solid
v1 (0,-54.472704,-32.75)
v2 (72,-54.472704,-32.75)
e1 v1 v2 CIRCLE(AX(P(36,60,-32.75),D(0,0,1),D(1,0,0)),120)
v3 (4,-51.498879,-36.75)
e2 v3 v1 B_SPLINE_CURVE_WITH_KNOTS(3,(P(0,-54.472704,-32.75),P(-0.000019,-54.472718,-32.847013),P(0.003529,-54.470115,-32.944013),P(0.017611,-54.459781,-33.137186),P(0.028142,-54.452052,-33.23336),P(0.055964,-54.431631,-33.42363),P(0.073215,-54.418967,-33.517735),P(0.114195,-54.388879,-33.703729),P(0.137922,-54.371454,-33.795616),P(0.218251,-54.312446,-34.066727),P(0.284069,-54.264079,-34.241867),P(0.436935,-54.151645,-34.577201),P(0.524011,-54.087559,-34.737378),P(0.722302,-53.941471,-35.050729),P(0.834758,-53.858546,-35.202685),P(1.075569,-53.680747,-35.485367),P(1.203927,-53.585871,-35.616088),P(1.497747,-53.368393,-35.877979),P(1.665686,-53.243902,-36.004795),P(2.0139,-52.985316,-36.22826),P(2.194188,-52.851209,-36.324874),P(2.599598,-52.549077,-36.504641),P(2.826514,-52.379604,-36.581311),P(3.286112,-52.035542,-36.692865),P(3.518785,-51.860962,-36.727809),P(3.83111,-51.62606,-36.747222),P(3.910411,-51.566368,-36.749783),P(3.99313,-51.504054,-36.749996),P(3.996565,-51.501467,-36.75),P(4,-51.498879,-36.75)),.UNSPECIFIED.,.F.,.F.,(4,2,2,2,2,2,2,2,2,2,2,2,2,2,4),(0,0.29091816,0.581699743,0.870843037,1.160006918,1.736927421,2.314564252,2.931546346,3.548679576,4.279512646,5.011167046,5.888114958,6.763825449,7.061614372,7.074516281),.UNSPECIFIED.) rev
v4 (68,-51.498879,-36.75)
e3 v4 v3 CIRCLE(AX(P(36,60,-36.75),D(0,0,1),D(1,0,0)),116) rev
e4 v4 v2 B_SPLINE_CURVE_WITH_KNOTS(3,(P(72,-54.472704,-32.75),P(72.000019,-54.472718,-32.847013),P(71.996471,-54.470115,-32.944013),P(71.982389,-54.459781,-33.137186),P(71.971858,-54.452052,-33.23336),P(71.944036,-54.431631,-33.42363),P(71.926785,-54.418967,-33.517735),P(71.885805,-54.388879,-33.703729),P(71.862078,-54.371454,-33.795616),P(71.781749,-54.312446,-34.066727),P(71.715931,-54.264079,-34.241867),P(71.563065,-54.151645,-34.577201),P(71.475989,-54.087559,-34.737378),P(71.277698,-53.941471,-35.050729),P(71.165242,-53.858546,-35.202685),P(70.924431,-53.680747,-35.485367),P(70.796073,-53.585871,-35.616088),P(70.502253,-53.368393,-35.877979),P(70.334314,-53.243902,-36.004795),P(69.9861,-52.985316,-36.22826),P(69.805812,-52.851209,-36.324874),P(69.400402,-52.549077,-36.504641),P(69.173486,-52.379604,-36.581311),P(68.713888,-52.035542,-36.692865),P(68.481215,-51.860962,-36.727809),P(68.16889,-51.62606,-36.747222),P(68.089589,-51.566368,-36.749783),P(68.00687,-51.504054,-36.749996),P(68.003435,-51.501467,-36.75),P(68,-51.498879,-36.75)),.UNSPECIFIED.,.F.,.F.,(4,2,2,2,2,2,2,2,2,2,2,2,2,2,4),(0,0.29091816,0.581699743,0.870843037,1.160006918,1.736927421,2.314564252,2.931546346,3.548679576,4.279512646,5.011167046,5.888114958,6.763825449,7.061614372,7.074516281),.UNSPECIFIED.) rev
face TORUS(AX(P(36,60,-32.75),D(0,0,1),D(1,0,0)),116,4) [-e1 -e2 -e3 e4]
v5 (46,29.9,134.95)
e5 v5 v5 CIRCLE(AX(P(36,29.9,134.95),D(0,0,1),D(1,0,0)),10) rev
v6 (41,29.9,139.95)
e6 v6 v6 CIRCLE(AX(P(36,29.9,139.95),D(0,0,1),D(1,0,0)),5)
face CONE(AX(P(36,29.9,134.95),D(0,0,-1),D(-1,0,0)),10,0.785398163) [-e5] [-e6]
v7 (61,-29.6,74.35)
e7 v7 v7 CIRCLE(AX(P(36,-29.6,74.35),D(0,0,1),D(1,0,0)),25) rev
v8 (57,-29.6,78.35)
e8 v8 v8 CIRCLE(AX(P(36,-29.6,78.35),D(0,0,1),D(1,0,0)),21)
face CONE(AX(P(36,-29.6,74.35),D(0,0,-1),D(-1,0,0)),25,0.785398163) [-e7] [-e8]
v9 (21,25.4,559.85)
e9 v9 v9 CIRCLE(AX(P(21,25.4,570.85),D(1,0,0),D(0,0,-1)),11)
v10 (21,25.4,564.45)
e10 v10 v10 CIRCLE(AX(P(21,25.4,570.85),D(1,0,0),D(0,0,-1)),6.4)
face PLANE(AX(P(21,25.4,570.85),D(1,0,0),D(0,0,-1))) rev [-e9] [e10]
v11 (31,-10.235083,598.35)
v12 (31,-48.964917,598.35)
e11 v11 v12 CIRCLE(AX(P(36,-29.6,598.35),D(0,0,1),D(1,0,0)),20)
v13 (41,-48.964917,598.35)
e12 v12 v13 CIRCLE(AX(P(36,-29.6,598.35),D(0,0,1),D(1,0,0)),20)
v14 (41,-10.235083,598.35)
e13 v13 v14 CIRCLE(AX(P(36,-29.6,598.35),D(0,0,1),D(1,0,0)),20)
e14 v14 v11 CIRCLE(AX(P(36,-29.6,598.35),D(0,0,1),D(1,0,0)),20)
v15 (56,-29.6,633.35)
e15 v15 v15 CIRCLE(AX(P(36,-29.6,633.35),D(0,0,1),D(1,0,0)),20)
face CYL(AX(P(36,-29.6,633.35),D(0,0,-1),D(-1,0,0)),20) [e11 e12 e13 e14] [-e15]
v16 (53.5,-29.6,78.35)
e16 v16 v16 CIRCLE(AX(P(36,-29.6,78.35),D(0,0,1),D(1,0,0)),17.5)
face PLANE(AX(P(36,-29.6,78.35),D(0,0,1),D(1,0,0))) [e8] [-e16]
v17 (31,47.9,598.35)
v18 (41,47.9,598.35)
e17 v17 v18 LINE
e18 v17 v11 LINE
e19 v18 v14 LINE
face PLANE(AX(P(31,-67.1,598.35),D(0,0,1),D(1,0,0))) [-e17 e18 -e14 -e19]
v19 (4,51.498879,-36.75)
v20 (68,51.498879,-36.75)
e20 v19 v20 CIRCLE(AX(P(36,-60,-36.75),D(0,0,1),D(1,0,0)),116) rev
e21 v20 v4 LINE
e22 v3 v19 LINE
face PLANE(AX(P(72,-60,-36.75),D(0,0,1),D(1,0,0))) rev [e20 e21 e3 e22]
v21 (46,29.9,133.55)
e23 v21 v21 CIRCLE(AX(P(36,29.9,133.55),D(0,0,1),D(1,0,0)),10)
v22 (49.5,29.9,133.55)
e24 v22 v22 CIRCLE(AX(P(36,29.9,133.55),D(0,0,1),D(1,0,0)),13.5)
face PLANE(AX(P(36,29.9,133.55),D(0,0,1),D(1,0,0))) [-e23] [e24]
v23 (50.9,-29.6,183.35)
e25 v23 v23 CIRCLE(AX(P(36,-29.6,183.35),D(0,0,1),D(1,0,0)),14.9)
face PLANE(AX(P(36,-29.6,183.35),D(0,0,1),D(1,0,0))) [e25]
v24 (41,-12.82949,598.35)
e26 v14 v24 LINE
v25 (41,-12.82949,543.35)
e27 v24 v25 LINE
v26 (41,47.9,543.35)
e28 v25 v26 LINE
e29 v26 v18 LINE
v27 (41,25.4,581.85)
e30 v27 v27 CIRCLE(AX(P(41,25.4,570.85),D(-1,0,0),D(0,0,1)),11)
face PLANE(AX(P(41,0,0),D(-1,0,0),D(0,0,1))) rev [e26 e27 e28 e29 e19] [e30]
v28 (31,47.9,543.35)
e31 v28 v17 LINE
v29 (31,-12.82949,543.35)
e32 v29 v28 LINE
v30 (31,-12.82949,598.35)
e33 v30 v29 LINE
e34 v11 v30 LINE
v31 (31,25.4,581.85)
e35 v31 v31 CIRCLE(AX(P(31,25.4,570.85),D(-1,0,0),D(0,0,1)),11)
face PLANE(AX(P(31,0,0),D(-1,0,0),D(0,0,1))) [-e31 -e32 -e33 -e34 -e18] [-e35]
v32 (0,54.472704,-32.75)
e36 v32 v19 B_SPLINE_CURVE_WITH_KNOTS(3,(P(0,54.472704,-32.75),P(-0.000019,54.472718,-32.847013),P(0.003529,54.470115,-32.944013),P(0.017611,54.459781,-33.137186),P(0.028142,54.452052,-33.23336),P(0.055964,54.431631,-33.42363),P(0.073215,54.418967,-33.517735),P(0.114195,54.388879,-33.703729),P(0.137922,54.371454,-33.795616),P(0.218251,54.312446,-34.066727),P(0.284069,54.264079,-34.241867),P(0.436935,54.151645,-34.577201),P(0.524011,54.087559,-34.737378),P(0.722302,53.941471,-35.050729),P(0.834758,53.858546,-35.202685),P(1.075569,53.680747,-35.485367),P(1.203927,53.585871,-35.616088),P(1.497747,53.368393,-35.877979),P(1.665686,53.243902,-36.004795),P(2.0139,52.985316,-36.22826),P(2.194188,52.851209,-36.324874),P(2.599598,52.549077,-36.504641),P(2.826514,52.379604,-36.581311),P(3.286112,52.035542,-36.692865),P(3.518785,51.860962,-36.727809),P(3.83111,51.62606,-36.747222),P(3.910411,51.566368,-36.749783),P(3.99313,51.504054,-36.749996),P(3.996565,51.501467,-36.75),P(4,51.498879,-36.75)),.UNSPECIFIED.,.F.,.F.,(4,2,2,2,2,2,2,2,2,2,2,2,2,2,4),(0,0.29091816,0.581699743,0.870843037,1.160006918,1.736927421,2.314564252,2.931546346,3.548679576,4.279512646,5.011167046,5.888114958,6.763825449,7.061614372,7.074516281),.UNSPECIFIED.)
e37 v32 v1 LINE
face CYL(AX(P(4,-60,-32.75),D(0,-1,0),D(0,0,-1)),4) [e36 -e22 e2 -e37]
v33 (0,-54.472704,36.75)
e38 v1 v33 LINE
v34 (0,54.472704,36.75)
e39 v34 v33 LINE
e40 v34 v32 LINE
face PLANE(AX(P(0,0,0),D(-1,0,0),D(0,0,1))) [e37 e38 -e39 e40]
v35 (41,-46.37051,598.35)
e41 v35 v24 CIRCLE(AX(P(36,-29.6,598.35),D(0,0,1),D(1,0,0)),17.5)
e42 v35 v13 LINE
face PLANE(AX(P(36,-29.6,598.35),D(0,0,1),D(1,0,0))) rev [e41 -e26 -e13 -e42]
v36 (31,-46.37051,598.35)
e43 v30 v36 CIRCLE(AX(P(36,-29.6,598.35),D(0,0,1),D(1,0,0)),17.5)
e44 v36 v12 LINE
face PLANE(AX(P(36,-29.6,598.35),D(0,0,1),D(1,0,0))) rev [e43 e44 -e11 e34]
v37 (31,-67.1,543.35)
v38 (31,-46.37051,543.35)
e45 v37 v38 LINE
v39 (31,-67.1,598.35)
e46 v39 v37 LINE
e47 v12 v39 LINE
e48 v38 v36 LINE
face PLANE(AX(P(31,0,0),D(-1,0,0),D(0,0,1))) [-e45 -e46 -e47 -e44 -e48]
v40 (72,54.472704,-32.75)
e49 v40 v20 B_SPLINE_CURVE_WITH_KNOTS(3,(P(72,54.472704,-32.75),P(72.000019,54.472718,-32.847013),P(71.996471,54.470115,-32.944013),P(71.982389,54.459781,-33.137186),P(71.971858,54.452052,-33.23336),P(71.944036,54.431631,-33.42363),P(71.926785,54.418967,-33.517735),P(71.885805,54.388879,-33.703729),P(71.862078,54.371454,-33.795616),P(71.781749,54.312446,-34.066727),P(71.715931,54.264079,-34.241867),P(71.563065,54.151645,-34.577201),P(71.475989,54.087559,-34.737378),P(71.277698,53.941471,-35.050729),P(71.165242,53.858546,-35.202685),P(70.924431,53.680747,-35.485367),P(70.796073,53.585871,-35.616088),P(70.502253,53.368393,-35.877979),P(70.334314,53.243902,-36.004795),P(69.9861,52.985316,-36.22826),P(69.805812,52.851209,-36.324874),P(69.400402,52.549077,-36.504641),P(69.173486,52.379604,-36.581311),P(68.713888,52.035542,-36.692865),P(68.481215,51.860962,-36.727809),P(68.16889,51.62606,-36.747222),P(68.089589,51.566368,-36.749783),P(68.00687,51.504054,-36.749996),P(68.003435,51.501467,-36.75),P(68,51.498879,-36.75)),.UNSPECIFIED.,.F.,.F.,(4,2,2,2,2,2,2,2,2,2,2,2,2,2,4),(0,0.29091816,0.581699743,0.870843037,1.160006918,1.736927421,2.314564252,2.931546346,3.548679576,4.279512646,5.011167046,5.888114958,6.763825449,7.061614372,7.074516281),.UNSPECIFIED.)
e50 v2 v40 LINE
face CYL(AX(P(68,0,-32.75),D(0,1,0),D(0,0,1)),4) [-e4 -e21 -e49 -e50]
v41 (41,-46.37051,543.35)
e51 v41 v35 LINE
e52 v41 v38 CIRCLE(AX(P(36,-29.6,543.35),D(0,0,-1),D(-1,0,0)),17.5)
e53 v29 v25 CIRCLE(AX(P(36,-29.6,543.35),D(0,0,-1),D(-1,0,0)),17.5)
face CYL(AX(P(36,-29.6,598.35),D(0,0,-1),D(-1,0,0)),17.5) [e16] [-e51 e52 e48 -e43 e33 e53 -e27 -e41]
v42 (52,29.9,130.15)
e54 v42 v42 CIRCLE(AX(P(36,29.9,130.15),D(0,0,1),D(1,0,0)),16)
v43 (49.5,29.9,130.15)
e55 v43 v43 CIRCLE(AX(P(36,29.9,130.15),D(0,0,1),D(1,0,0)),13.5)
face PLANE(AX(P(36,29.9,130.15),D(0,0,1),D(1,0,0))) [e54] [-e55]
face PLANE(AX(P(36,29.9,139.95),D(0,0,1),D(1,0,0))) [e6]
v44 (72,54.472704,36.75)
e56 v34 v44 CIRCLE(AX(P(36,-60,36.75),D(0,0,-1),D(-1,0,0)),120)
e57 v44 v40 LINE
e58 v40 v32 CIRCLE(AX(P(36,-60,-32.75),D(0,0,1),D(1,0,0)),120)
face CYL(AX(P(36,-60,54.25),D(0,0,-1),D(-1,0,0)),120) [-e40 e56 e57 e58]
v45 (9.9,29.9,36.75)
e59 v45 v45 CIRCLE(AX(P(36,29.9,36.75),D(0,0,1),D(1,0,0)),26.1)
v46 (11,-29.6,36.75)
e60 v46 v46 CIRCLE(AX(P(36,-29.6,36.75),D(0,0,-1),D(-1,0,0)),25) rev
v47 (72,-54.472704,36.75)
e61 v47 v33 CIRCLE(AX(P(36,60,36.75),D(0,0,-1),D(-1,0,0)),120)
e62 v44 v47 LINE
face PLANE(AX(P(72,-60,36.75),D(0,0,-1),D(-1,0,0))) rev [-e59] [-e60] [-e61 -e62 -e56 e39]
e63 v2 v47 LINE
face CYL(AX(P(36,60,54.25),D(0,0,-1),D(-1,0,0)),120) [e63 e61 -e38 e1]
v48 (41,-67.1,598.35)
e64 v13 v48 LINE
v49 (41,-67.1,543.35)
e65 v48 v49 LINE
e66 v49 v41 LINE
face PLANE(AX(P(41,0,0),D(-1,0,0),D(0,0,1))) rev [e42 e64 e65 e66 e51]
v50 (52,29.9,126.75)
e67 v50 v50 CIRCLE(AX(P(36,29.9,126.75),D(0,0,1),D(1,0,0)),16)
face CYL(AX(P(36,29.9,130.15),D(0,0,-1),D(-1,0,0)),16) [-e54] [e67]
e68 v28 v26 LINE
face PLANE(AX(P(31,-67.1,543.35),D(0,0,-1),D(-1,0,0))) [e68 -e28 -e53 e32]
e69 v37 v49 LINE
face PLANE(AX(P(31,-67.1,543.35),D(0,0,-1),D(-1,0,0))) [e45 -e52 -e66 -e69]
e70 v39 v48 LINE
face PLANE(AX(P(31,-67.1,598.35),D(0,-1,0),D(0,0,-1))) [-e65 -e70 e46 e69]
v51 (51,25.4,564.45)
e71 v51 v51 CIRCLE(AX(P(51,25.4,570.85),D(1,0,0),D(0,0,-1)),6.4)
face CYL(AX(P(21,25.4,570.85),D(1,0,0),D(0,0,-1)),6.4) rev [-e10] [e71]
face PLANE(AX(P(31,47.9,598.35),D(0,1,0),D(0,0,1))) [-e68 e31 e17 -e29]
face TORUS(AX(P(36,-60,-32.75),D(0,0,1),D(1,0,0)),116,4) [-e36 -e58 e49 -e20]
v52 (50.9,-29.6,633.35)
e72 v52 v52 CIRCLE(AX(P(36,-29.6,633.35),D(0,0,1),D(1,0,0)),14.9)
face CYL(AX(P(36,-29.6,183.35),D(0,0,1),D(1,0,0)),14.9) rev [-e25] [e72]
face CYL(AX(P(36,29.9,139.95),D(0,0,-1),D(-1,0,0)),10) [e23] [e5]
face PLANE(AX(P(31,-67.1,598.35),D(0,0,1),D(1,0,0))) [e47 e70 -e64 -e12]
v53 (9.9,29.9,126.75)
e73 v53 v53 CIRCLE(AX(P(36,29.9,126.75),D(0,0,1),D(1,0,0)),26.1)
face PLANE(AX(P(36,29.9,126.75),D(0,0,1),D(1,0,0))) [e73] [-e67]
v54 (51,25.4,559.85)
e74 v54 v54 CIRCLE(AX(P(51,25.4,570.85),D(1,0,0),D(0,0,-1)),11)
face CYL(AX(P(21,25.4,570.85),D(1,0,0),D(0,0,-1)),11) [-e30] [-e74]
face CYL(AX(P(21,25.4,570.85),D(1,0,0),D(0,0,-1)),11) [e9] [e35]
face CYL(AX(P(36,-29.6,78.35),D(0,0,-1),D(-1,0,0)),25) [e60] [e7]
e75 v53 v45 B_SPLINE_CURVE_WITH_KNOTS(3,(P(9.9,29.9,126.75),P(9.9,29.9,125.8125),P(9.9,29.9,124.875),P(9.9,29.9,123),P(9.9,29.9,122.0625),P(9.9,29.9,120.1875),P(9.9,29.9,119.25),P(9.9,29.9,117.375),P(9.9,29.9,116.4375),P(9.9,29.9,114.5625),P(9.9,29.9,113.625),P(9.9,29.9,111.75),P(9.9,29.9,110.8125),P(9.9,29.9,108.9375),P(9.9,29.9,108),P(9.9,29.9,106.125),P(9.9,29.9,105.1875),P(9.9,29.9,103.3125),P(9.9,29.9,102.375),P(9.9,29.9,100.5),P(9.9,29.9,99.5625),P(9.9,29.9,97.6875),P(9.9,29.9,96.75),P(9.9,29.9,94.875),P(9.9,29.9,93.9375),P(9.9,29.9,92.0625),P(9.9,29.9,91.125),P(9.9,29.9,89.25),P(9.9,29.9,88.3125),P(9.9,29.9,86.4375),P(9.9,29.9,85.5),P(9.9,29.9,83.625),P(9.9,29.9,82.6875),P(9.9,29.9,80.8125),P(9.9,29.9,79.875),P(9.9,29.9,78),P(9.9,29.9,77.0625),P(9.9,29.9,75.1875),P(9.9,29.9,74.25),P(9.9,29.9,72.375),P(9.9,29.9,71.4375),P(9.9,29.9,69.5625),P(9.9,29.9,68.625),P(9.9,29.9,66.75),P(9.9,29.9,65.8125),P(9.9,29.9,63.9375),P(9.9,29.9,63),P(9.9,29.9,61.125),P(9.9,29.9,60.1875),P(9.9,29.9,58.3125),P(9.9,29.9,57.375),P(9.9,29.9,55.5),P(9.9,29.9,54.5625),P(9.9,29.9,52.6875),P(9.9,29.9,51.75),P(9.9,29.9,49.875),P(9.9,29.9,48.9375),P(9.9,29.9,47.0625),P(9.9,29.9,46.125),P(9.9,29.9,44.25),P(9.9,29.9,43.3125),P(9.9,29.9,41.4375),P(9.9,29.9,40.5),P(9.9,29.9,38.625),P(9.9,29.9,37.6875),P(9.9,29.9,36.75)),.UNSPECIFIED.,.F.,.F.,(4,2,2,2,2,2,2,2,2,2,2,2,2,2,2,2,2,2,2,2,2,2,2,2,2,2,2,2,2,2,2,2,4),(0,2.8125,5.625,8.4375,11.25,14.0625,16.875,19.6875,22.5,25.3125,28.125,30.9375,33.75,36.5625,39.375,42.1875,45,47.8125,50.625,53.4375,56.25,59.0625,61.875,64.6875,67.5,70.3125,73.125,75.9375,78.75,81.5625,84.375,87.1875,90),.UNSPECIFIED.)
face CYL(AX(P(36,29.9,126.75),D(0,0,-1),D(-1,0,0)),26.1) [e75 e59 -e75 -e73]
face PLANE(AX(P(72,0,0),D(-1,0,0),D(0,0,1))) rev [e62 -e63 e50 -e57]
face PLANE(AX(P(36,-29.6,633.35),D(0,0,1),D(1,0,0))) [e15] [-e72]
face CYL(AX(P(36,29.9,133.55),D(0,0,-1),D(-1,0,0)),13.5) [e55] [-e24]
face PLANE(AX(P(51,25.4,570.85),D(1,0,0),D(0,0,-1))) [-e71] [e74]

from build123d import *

# Parameters (mm, degrees)
CROQUIS1_W                    = 73.5
CROQUIS1_H                    = 120
SALIENTE_EXTRUIR1_DEPTH       = 72
CROQUIS2_R                    = 26.1
SALIENTE_EXTRUIR2_DEPTH       = 90
CROQUIS3_R                    = 16
SALIENTE_EXTRUIR3_DEPTH       = 3.4
CROQUIS4_R                    = 13.5
SALIENTE_EXTRUIR4_DEPTH       = 3.4
CROQUIS5_R                    = 10
SALIENTE_EXTRUIR5_DEPTH       = 6.4
CHAFL_N1_SIZE                 = 5
CROQUIS6_R                    = 25
SALIENTE_EXTRUIR6_DEPTH       = 41.6
CROQUIS7_R                    = 17.5
SALIENTE_EXTRUIR7_DEPTH       = 520
CHAFL_N2_SIZE                 = 4
CROQUIS8_R                    = 20
SALIENTE_EXTRUIR8_DEPTH       = 35
SALIENTE_EXTRUIR11_DEPTH      = 5
SALIENTE_EXTRUIR11_DEPTH_BACK = 5
CROQUIS11_W                   = 55
CROQUIS11_H                   = 115
CROQUIS9_R                    = 14.9
CORTAR_EXTRUIR1_DEPTH         = 450
SALIENTE_EXTRUIR12_DEPTH      = 10
SALIENTE_EXTRUIR12_DEPTH_BACK = 20
CROQUIS12_R                   = 11
CROQUIS13_R                   = 6.4
CORTAR_EXTRUIR2_DEPTH         = 30
CORTAR_EXTRUIR4_DEPTH         = 91
REDONDEO1_R                   = 4


with BuildPart() as part:
    # Croquis1 → Saliente-Extruir1 (new body)
    with BuildSketch(Plane(origin=(0, 0, 0), x_dir=(0, 0, -1), z_dir=(1, 0, 0))):
        Rectangle(CROQUIS1_W, CROQUIS1_H)
    extrude(amount=SALIENTE_EXTRUIR1_DEPTH)

    # Croquis2 → Saliente-Extruir2 (add)
    with BuildSketch(Plane.XY.offset(36.75)):
        with Locations((36, 29.9)):
            Circle(CROQUIS2_R)
    extrude(amount=SALIENTE_EXTRUIR2_DEPTH)

    # Croquis3 → Saliente-Extruir3 (add)
    with BuildSketch(Plane.XY.offset(126.75)):
        with Locations((36, 29.9)):
            Circle(CROQUIS3_R)
    extrude(amount=SALIENTE_EXTRUIR3_DEPTH)

    # Croquis4 → Saliente-Extruir4 (add)
    with BuildSketch(Plane.XY.offset(130.15)):
        with Locations((36, 29.9)):
            Circle(CROQUIS4_R)
    extrude(amount=SALIENTE_EXTRUIR4_DEPTH)

    # Croquis5 → Saliente-Extruir5 (add)
    with BuildSketch(Plane.XY.offset(133.55)):
        with Locations((36, 29.9)):
            Circle(CROQUIS5_R)
    extrude(amount=SALIENTE_EXTRUIR5_DEPTH)

    # Chaflán1
    chafl_n1_edges = [part.edges().sort_by_distance(p)[0] for p in [
        (26, 29.9, 139.95),
    ]]
    chamfer(chafl_n1_edges, length=CHAFL_N1_SIZE)

    # Croquis6 → Saliente-Extruir6 (add)
    with BuildSketch(Plane.XY.offset(36.75)):
        with Locations((36, -29.6)):
            Circle(CROQUIS6_R)
    extrude(amount=SALIENTE_EXTRUIR6_DEPTH)

    # Croquis7 → Saliente-Extruir7 (add)
    with BuildSketch(Plane.XY.offset(78.35)):
        with Locations((36, -29.6)):
            Circle(CROQUIS7_R)
    extrude(amount=SALIENTE_EXTRUIR7_DEPTH)

    # Chaflán2
    chafl_n2_edges = [part.edges().sort_by_distance(p)[0] for p in [
        (11, -29.6, 78.35),
    ]]
    chamfer(chafl_n2_edges, length=CHAFL_N2_SIZE)

    # Croquis8 → Saliente-Extruir8 (add)
    with BuildSketch(Plane.XY.offset(598.35)):
        with Locations((36, -29.6)):
            Circle(CROQUIS8_R)
    extrude(amount=SALIENTE_EXTRUIR8_DEPTH)

    # Croquis11 → Saliente-Extruir11 (add, two sides: drawn at the far end of the back side and taken through both)
    with BuildSketch(Plane(origin=(36, 0, 0), x_dir=(0, 0, -1), z_dir=(1, 0, 0)).offset(-SALIENTE_EXTRUIR11_DEPTH_BACK)):
        with Locations((-570.85, -9.6)):
            Rectangle(CROQUIS11_W, CROQUIS11_H)
    extrude(amount=SALIENTE_EXTRUIR11_DEPTH + SALIENTE_EXTRUIR11_DEPTH_BACK)

    # Croquis9 → Cortar-Extruir1 (cut)
    with BuildSketch(Plane.XY.offset(633.35)):
        with Locations((36, -29.6)):
            Circle(CROQUIS9_R)
    extrude(amount=-CORTAR_EXTRUIR1_DEPTH, mode=Mode.SUBTRACT)

    # Croquis12 → Saliente-Extruir12 (add, two sides: drawn at the far end of the back side and taken through both)
    with BuildSketch(Plane(origin=(41, 0, 0), x_dir=(0, 0, -1), z_dir=(1, 0, 0)).offset(-SALIENTE_EXTRUIR12_DEPTH_BACK)):
        with Locations((-570.85, 25.4)):
            Circle(CROQUIS12_R)
    extrude(amount=SALIENTE_EXTRUIR12_DEPTH + SALIENTE_EXTRUIR12_DEPTH_BACK)

    # Croquis13 → Cortar-Extruir2 (cut)
    with BuildSketch(Plane(origin=(51, 0, 0), x_dir=(0, 0, -1), z_dir=(1, 0, 0))):
        with Locations((-570.85, 25.4)):
            Circle(CROQUIS13_R)
    extrude(amount=-CORTAR_EXTRUIR2_DEPTH, mode=Mode.SUBTRACT)

    # Croquis14 → Cortar-Extruir4 (cut)
    with BuildSketch(Plane(origin=(0, 0, -36.75), x_dir=(-1, 0, 0), z_dir=(0, 0, -1))):
        with BuildLine():
            ThreePointArc((-36, 60), (-17.789076086, 58.610127098), (0, 54.47270417))
            Line((0, 54.47270417), (0, 60))
            Line((0, 60), (-36, 60))
        make_face()
        with BuildLine():
            Line((0, -60), (0, -54.47270417))
            ThreePointArc((0, -54.47270417), (-17.789076086, -58.610127098), (-36, -60))
            Line((-36, -60), (0, -60))
        make_face()
        with BuildLine():
            Line((-72, 60), (-72, 54.47270417))
            ThreePointArc((-72, 54.47270417), (-54.210923914, 58.610127098), (-36, 60))
            Line((-36, 60), (-72, 60))
        make_face()
        with BuildLine():
            ThreePointArc((-36, -60), (-54.210923914, -58.610127098), (-72, -54.47270417))
            Line((-72, -54.47270417), (-72, -60))
            Line((-72, -60), (-36, -60))
        make_face()
    extrude(amount=-CORTAR_EXTRUIR4_DEPTH, mode=Mode.SUBTRACT)

    # Redondeo1
    redondeo1_edges = [part.edges().sort_by_distance(p)[0] for p in [
        (0, 0, -36.75),
        (36, -60, -36.75),
        (72, 0, -36.75),
        (36, 60, -36.75),
    ]]
    fillet(redondeo1_edges, radius=REDONDEO1_R)


solid = part.part
